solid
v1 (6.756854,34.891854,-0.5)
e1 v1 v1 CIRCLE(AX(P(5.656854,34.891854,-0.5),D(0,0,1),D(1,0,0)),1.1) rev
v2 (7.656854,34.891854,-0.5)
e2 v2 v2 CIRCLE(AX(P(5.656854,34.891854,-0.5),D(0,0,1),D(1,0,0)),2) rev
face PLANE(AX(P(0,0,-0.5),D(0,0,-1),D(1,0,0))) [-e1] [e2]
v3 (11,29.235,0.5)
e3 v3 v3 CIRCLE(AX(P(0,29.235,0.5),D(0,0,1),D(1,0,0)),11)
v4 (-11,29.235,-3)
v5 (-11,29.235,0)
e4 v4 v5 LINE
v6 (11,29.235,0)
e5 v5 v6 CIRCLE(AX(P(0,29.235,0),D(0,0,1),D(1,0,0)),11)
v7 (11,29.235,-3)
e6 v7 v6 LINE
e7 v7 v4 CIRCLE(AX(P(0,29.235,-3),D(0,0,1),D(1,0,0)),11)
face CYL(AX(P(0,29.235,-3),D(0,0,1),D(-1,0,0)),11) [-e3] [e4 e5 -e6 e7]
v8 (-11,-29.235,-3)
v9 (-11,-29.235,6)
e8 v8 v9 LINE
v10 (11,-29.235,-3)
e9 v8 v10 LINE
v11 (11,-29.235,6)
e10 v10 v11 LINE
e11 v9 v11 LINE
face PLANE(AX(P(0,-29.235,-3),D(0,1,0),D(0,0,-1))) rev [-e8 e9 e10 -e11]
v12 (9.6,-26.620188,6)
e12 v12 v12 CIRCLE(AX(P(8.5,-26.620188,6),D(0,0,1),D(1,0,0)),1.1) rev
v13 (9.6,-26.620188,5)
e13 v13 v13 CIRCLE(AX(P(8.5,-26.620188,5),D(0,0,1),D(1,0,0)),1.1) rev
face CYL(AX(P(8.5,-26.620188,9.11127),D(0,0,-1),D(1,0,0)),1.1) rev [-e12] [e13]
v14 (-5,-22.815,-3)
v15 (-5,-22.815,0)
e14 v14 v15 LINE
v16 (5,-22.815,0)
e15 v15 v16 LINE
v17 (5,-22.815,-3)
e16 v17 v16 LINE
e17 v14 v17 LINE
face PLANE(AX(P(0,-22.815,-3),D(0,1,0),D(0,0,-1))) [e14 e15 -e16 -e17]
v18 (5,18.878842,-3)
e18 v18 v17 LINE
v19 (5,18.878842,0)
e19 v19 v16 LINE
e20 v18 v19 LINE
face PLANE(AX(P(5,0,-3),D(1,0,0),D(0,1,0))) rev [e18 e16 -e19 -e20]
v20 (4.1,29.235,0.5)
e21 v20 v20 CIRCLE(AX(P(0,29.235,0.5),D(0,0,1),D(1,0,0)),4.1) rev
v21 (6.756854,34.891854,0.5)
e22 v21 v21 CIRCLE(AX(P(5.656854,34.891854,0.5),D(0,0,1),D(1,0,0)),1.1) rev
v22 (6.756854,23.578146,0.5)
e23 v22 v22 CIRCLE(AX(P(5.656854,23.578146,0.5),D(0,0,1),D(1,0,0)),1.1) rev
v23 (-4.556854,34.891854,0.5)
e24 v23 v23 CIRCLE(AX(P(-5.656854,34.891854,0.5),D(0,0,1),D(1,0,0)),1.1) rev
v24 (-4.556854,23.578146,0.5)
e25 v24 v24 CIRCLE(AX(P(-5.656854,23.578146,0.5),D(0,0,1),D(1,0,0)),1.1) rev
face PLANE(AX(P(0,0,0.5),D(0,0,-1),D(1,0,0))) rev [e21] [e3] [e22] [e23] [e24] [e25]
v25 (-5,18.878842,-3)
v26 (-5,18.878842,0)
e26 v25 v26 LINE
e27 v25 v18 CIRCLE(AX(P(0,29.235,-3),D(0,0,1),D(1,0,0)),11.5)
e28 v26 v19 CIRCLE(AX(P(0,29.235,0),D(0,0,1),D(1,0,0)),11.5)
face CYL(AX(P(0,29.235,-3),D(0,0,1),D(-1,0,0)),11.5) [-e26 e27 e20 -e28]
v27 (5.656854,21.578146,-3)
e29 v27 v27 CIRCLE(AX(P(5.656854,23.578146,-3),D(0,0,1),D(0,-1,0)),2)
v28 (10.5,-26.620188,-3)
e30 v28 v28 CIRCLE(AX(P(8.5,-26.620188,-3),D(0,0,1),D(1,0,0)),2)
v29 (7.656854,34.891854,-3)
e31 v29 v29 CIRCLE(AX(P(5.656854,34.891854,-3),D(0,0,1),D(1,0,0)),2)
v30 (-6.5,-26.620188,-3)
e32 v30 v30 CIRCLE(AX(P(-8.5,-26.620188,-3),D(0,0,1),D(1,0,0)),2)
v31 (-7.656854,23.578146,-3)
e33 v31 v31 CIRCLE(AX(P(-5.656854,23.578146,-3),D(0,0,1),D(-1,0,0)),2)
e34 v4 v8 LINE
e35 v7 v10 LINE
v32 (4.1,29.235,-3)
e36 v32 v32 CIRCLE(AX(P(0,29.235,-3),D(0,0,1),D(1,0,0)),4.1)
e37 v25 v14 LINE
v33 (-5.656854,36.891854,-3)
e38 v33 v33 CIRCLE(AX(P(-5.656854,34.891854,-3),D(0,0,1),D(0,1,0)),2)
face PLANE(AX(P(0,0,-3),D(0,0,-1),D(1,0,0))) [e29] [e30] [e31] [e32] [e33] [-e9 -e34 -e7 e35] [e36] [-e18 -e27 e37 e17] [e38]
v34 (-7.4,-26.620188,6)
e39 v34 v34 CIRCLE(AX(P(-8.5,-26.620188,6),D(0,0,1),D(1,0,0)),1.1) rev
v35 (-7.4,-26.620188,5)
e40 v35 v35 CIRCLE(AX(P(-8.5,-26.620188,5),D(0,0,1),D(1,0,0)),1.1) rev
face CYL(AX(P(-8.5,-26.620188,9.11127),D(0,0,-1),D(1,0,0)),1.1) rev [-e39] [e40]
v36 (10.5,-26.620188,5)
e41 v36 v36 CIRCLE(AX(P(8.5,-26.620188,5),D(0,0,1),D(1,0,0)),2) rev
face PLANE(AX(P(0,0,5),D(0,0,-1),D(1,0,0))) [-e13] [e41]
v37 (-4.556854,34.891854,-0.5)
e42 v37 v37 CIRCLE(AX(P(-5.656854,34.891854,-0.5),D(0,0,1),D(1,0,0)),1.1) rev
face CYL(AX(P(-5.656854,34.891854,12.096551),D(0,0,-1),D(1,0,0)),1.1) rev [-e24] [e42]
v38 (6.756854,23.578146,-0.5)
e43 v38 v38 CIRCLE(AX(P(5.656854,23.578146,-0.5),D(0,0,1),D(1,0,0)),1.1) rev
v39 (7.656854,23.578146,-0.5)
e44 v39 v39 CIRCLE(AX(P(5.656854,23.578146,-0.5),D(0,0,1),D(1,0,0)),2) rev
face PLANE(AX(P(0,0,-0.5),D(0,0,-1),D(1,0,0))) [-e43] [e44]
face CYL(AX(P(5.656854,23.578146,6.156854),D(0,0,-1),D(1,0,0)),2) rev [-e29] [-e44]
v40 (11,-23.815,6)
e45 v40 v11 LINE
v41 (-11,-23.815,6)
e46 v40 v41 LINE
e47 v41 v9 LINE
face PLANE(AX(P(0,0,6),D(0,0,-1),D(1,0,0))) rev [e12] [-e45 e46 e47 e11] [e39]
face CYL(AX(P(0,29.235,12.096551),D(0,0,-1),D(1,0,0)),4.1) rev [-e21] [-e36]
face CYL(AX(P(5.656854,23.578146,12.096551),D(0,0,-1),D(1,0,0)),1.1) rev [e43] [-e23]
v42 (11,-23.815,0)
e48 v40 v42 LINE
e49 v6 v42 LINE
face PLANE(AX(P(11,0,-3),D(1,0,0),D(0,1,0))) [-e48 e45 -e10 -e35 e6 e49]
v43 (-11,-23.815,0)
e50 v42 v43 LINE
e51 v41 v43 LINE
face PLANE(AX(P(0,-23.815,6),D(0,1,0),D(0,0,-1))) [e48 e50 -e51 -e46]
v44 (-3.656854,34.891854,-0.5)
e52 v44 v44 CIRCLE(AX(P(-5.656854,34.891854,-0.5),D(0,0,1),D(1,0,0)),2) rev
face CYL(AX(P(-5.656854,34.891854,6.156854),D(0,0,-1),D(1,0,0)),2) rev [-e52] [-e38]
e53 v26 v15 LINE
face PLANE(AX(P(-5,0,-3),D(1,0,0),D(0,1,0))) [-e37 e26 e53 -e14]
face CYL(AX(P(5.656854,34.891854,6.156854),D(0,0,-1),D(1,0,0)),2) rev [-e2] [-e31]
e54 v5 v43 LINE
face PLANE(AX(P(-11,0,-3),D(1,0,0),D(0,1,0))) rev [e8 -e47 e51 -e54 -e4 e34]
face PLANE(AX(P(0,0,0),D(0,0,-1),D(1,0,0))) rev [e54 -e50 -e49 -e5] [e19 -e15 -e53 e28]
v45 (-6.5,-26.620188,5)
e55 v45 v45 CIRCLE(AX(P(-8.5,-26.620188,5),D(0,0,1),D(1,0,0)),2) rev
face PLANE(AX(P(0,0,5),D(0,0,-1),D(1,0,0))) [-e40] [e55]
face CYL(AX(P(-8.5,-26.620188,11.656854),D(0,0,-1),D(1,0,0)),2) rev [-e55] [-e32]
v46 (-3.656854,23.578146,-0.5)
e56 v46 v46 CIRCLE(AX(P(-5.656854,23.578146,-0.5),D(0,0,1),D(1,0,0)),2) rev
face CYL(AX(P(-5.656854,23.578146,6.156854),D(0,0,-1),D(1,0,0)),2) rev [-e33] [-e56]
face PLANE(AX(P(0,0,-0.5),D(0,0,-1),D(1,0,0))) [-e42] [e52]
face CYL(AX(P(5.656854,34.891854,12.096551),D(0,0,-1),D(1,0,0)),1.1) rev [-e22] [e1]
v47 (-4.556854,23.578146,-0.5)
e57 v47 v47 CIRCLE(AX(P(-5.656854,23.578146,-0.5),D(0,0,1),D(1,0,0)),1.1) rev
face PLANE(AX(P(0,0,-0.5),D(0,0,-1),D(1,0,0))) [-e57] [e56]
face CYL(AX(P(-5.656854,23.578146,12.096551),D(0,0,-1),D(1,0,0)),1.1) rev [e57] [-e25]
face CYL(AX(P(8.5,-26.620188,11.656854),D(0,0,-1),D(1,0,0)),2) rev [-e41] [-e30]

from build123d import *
from build123d.topology import SkipClean

# Parameters (mm, degrees)
BOSS_EXTRUDE1_DEPTH           = 3
BOSS_EXTRUDE2_START           = -0.5
SKETCH1_3_R                   = 11
BOSS_EXTRUDE2_DEPTH           = 0.5
SKETCH2_R                     = 4.1
SKETCH2_R_2                   = 1.1
CUT_EXTRUDE1_DEPTH            = 3.5
SKETCH2_3_R                   = 2
CUT_EXTRUDE2_DEPTH            = 2.5
CIRPATTERN2_COUNT             = 4
SKETCH1_6_W                   = 11
SKETCH1_6_H                   = 5.42
BOSS_EXTRUDE3_DEPTH           = 6
SKETCH3_R                     = 1.1
CUT_EXTRUDE3_DEPTH            = 9
SKETCH3_3_R                   = 2
SKETCH3_3_R_2                 = 1.1
CUT_EXTRUDE4_DEPTH            = 8
BODY_MOVE_COPY1_START         = -3
BODY_MOVE_COPY1_OUTLINE_R     = 2
BODY_MOVE_COPY1_OUTLINE_R_2   = 4.1
BODY_MOVE_COPY1_DEPTH         = 3
BODY_MOVE_COPY1_START_2       = 3
BODY_MOVE_COPY1_2_OUTLINE_W   = 22
BODY_MOVE_COPY1_2_OUTLINE_H   = 5.42
BODY_MOVE_COPY1_2_OUTLINE_R   = 2
BODY_MOVE_COPY1_2_DEPTH       = 3
BODY_MOVE_COPY1_START_3       = 5
BODY_MOVE_COPY1_3_OUTLINE_R   = 2
BODY_MOVE_COPY1_3_OUTLINE_R_2 = 1.1
BODY_MOVE_COPY1_3_DEPTH       = 1
BODY_MOVE_COPY1_START_4       = 0.5
BODY_MOVE_COPY1_4_OUTLINE_R   = 2
BODY_MOVE_COPY1_4_OUTLINE_R_2 = 4.1
BODY_MOVE_COPY1_4_DEPTH       = 2.5
BODY_MOVE_COPY1_START_5       = -6
BODY_MOVE_COPY1_5_OUTLINE_W   = 22
BODY_MOVE_COPY1_5_OUTLINE_H   = 5.42
BODY_MOVE_COPY1_5_OUTLINE_R   = 1.1
BODY_MOVE_COPY1_5_DEPTH       = 3
BODY_MOVE_COPY1_6_DEPTH       = 0.5


# Read off the part's stored shape, not the designer's step: Body-Move/Copy1
with BuildPart() as part:
    # Sketch1 → Boss-Extrude1 (new body)
    with BuildSketch(Plane.XY):
        with BuildLine():
            Line((-11, 29.235), (-11, -29.235))
            Line((-11, -29.235), (11, -29.235))
            Line((11, -29.235), (11, 29.235))
            ThreePointArc((11, 29.235), (0, 40.235), (-11, 29.235))
        make_face()
        with BuildLine():
            Line((5, -22.815), (-5, -22.815))
            Line((-5, -22.815), (-5, 18.878842411))
            ThreePointArc((-5, 18.878842411), (0, 17.735), (5, 18.878842411))
            Line((5, 18.878842411), (5, -22.815))
        make_face(mode=Mode.SUBTRACT)
    extrude(amount=BOSS_EXTRUDE1_DEPTH)

    # Sketch1<3> → Boss-Extrude2 (add)
    with BuildSketch(Plane.XY.offset(BOSS_EXTRUDE2_START)):
        with Locations((0, 29.235)):
            Circle(SKETCH1_3_R)
    extrude(amount=BOSS_EXTRUDE2_DEPTH)

    # Sketch2 → Cut-Extrude1 (cut)
    with BuildSketch(Plane.XY.offset(3)):
        with Locations((0, 29.235)):
            Circle(SKETCH2_R)
        with Locations((5.656854249, 34.891854249)):
            Circle(SKETCH2_R_2)
    cut_extrude1 = extrude(amount=-CUT_EXTRUDE1_DEPTH, mode=Mode.SUBTRACT)

    # Sketch2<3> → Cut-Extrude2 (cut)
    with BuildSketch(Plane.XY.offset(3)):
        with Locations((5.656854249, 34.891854249)):
            Circle(SKETCH2_3_R)
    cut_extrude2 = extrude(amount=-CUT_EXTRUDE2_DEPTH, mode=Mode.SUBTRACT)

    # CirPattern2: Cut-Extrude1, Cut-Extrude2 ×4 about axis
    cirpattern2_axis = Axis((0, 29.235, 0), (0, 0, 1))
    add([cut_extrude1.rotate(cirpattern2_axis, i * 360 / CIRPATTERN2_COUNT) for i in range(1, CIRPATTERN2_COUNT)], mode=Mode.SUBTRACT)
    add([cut_extrude2.rotate(cirpattern2_axis, i * 360 / CIRPATTERN2_COUNT) for i in range(1, CIRPATTERN2_COUNT)], mode=Mode.SUBTRACT)

    # Sketch1<6> → Boss-Extrude3 (add)
    with BuildSketch(Plane.XY):
        with Locations((-5.5, -26.525)):
            Rectangle(SKETCH1_6_W, SKETCH1_6_H)
        with Locations((5.5, -26.525)):
            Rectangle(SKETCH1_6_W, SKETCH1_6_H)
    extrude(amount=-BOSS_EXTRUDE3_DEPTH)

    # Sketch3 → Cut-Extrude3 (cut)
    with BuildSketch(Plane.XY.offset(3)):
        with Locations((-8.5, -26.62018786)):
            Circle(SKETCH3_R)
        with Locations((8.5, -26.62018786)):
            Circle(SKETCH3_R)
    extrude(amount=-CUT_EXTRUDE3_DEPTH, mode=Mode.SUBTRACT)

    # Sketch3<3> → Cut-Extrude4 (cut)
    # profile 1 of 2: a face of its own
    with BuildSketch(Plane.XY.offset(3)):
        with Locations((-8.5, -26.62018786)):
            Circle(SKETCH3_3_R)
        with Locations((-8.5, -26.62018786)):
            Circle(SKETCH3_3_R_2, mode=Mode.SUBTRACT)
    # profile 2 of 2: a face of its own
    with BuildSketch(Plane.XY.offset(3)):
        with Locations((8.5, -26.62018786)):
            Circle(SKETCH3_3_R)
        with Locations((8.5, -26.62018786)):
            Circle(SKETCH3_3_R_2, mode=Mode.SUBTRACT)
    extrude(amount=-CUT_EXTRUDE4_DEPTH, mode=Mode.SUBTRACT)

    # Body-Move/Copy1 outline → Body-Move/Copy1 (add)
    with BuildSketch(Plane.XY.offset(BODY_MOVE_COPY1_START)):
        with BuildLine():
            Line((-11, -23.815), (11, -23.815))
            Line((11, -23.815), (11, 29.235))
            ThreePointArc((11, 29.235), (0, 40.235), (-11, 29.235))
            Line((-11, 29.235), (-11, -23.815))
        make_face()
        with BuildLine():
            Line((5, 18.878842411), (5, -22.815))
            Line((5, -22.815), (-5, -22.815))
            Line((-5, -22.815), (-5, 18.878842411))
            ThreePointArc((-5, 18.878842411), (0, 17.735), (5, 18.878842411))
        make_face(mode=Mode.SUBTRACT)
        with Locations((5.656854249, 34.891854249)):
            Circle(BODY_MOVE_COPY1_OUTLINE_R, mode=Mode.SUBTRACT)
        with Locations((-5.656854249, 23.578145751)):
            Circle(BODY_MOVE_COPY1_OUTLINE_R, mode=Mode.SUBTRACT)
        with Locations((-5.656854249, 34.891854249)):
            Circle(BODY_MOVE_COPY1_OUTLINE_R, mode=Mode.SUBTRACT)
        with Locations((0, 29.235)):
            Circle(BODY_MOVE_COPY1_OUTLINE_R_2, mode=Mode.SUBTRACT)
        with Locations((5.656854249, 23.578145751)):
            Circle(BODY_MOVE_COPY1_OUTLINE_R, mode=Mode.SUBTRACT)
    extrude(amount=BODY_MOVE_COPY1_DEPTH)

    # Body-Move_Copy1 2 outline → Body-Move_Copy1 2 (add)
    with BuildSketch(Plane.XY.offset(BODY_MOVE_COPY1_START_2)):
        with Locations((0, -26.525)):
            Rectangle(BODY_MOVE_COPY1_2_OUTLINE_W, BODY_MOVE_COPY1_2_OUTLINE_H)
        with Locations((-8.5, -26.62018786)):
            Circle(BODY_MOVE_COPY1_2_OUTLINE_R, mode=Mode.SUBTRACT)
        with Locations((8.5, -26.62018786)):
            Circle(BODY_MOVE_COPY1_2_OUTLINE_R, mode=Mode.SUBTRACT)
    extrude(amount=BODY_MOVE_COPY1_2_DEPTH)

    # Body-Move_Copy1 3 outline → Body-Move_Copy1 3 (add)
    # profile 1 of 2: a face of its own
    with BuildSketch(Plane.XY.offset(BODY_MOVE_COPY1_START_3)):
        with Locations((-8.5, -26.62018786)):
            Circle(BODY_MOVE_COPY1_3_OUTLINE_R)
        with Locations((-8.5, -26.62018786)):
            Circle(BODY_MOVE_COPY1_3_OUTLINE_R_2, mode=Mode.SUBTRACT)
    # profile 2 of 2: a face of its own
    with BuildSketch(Plane.XY.offset(BODY_MOVE_COPY1_START_3)):
        with Locations((8.5, -26.62018786)):
            Circle(BODY_MOVE_COPY1_3_OUTLINE_R)
        with Locations((8.5, -26.62018786)):
            Circle(BODY_MOVE_COPY1_3_OUTLINE_R_2, mode=Mode.SUBTRACT)
    extrude(amount=BODY_MOVE_COPY1_3_DEPTH)

    # Body-Move_Copy1 4 outline → Body-Move_Copy1 4 (cut)
    with BuildSketch(Plane.XY.offset(BODY_MOVE_COPY1_START_4)):
        with BuildLine():
            Line((-11, -23.815), (11, -23.815))
            Line((11, -23.815), (11, 29.235))
            ThreePointArc((11, 29.235), (0, 40.235), (-11, 29.235))
            Line((-11, 29.235), (-11, -23.815))
        make_face()
        with BuildLine():
            Line((5, 18.878842411), (5, -22.815))
            Line((5, -22.815), (-5, -22.815))
            Line((-5, -22.815), (-5, 18.878842411))
            ThreePointArc((-5, 18.878842411), (0, 17.735), (5, 18.878842411))
        make_face(mode=Mode.SUBTRACT)
        with Locations((5.656854249, 34.891854249)):
            Circle(BODY_MOVE_COPY1_4_OUTLINE_R, mode=Mode.SUBTRACT)
        with Locations((-5.656854249, 23.578145751)):
            Circle(BODY_MOVE_COPY1_4_OUTLINE_R, mode=Mode.SUBTRACT)
        with Locations((-5.656854249, 34.891854249)):
            Circle(BODY_MOVE_COPY1_4_OUTLINE_R, mode=Mode.SUBTRACT)
        with Locations((0, 29.235)):
            Circle(BODY_MOVE_COPY1_4_OUTLINE_R_2, mode=Mode.SUBTRACT)
        with Locations((5.656854249, 23.578145751)):
            Circle(BODY_MOVE_COPY1_4_OUTLINE_R, mode=Mode.SUBTRACT)
    extrude(amount=BODY_MOVE_COPY1_4_DEPTH, mode=Mode.SUBTRACT)

    # Body-Move_Copy1 5 outline → Body-Move_Copy1 5 (cut)
    with BuildSketch(Plane.XY.offset(BODY_MOVE_COPY1_START_5)):
        with Locations((0, -26.525)):
            Rectangle(BODY_MOVE_COPY1_5_OUTLINE_W, BODY_MOVE_COPY1_5_OUTLINE_H)
        with Locations((-8.5, -26.62018786)):
            Circle(BODY_MOVE_COPY1_5_OUTLINE_R, mode=Mode.SUBTRACT)
        with Locations((8.5, -26.62018786)):
            Circle(BODY_MOVE_COPY1_5_OUTLINE_R, mode=Mode.SUBTRACT)
    extrude(amount=BODY_MOVE_COPY1_5_DEPTH, mode=Mode.SUBTRACT)

    # Body-Move_Copy1 6 outline → Body-Move_Copy1 6 (cut)
    with SkipClean():  # the faces are left unmerged after this step: merging them gives an invalid solid
        with BuildSketch(Plane.XY):
            with BuildLine():
                Line((-11, -23.815), (11, -23.815))
                Line((11, -23.815), (11, 29.235))
                ThreePointArc((11, 29.235), (0, 18.235), (-11, 29.235))
                Line((-11, 29.235), (-11, -23.815))
            make_face()
            with BuildLine():
                Line((5, 18.878842411), (5, -22.815))
                Line((5, -22.815), (-5, -22.815))
                Line((-5, -22.815), (-5, 18.878842411))
                ThreePointArc((-5, 18.878842411), (0, 17.735), (5, 18.878842411))
            make_face(mode=Mode.SUBTRACT)
        extrude(amount=BODY_MOVE_COPY1_6_DEPTH, mode=Mode.SUBTRACT)


solid = part.part
